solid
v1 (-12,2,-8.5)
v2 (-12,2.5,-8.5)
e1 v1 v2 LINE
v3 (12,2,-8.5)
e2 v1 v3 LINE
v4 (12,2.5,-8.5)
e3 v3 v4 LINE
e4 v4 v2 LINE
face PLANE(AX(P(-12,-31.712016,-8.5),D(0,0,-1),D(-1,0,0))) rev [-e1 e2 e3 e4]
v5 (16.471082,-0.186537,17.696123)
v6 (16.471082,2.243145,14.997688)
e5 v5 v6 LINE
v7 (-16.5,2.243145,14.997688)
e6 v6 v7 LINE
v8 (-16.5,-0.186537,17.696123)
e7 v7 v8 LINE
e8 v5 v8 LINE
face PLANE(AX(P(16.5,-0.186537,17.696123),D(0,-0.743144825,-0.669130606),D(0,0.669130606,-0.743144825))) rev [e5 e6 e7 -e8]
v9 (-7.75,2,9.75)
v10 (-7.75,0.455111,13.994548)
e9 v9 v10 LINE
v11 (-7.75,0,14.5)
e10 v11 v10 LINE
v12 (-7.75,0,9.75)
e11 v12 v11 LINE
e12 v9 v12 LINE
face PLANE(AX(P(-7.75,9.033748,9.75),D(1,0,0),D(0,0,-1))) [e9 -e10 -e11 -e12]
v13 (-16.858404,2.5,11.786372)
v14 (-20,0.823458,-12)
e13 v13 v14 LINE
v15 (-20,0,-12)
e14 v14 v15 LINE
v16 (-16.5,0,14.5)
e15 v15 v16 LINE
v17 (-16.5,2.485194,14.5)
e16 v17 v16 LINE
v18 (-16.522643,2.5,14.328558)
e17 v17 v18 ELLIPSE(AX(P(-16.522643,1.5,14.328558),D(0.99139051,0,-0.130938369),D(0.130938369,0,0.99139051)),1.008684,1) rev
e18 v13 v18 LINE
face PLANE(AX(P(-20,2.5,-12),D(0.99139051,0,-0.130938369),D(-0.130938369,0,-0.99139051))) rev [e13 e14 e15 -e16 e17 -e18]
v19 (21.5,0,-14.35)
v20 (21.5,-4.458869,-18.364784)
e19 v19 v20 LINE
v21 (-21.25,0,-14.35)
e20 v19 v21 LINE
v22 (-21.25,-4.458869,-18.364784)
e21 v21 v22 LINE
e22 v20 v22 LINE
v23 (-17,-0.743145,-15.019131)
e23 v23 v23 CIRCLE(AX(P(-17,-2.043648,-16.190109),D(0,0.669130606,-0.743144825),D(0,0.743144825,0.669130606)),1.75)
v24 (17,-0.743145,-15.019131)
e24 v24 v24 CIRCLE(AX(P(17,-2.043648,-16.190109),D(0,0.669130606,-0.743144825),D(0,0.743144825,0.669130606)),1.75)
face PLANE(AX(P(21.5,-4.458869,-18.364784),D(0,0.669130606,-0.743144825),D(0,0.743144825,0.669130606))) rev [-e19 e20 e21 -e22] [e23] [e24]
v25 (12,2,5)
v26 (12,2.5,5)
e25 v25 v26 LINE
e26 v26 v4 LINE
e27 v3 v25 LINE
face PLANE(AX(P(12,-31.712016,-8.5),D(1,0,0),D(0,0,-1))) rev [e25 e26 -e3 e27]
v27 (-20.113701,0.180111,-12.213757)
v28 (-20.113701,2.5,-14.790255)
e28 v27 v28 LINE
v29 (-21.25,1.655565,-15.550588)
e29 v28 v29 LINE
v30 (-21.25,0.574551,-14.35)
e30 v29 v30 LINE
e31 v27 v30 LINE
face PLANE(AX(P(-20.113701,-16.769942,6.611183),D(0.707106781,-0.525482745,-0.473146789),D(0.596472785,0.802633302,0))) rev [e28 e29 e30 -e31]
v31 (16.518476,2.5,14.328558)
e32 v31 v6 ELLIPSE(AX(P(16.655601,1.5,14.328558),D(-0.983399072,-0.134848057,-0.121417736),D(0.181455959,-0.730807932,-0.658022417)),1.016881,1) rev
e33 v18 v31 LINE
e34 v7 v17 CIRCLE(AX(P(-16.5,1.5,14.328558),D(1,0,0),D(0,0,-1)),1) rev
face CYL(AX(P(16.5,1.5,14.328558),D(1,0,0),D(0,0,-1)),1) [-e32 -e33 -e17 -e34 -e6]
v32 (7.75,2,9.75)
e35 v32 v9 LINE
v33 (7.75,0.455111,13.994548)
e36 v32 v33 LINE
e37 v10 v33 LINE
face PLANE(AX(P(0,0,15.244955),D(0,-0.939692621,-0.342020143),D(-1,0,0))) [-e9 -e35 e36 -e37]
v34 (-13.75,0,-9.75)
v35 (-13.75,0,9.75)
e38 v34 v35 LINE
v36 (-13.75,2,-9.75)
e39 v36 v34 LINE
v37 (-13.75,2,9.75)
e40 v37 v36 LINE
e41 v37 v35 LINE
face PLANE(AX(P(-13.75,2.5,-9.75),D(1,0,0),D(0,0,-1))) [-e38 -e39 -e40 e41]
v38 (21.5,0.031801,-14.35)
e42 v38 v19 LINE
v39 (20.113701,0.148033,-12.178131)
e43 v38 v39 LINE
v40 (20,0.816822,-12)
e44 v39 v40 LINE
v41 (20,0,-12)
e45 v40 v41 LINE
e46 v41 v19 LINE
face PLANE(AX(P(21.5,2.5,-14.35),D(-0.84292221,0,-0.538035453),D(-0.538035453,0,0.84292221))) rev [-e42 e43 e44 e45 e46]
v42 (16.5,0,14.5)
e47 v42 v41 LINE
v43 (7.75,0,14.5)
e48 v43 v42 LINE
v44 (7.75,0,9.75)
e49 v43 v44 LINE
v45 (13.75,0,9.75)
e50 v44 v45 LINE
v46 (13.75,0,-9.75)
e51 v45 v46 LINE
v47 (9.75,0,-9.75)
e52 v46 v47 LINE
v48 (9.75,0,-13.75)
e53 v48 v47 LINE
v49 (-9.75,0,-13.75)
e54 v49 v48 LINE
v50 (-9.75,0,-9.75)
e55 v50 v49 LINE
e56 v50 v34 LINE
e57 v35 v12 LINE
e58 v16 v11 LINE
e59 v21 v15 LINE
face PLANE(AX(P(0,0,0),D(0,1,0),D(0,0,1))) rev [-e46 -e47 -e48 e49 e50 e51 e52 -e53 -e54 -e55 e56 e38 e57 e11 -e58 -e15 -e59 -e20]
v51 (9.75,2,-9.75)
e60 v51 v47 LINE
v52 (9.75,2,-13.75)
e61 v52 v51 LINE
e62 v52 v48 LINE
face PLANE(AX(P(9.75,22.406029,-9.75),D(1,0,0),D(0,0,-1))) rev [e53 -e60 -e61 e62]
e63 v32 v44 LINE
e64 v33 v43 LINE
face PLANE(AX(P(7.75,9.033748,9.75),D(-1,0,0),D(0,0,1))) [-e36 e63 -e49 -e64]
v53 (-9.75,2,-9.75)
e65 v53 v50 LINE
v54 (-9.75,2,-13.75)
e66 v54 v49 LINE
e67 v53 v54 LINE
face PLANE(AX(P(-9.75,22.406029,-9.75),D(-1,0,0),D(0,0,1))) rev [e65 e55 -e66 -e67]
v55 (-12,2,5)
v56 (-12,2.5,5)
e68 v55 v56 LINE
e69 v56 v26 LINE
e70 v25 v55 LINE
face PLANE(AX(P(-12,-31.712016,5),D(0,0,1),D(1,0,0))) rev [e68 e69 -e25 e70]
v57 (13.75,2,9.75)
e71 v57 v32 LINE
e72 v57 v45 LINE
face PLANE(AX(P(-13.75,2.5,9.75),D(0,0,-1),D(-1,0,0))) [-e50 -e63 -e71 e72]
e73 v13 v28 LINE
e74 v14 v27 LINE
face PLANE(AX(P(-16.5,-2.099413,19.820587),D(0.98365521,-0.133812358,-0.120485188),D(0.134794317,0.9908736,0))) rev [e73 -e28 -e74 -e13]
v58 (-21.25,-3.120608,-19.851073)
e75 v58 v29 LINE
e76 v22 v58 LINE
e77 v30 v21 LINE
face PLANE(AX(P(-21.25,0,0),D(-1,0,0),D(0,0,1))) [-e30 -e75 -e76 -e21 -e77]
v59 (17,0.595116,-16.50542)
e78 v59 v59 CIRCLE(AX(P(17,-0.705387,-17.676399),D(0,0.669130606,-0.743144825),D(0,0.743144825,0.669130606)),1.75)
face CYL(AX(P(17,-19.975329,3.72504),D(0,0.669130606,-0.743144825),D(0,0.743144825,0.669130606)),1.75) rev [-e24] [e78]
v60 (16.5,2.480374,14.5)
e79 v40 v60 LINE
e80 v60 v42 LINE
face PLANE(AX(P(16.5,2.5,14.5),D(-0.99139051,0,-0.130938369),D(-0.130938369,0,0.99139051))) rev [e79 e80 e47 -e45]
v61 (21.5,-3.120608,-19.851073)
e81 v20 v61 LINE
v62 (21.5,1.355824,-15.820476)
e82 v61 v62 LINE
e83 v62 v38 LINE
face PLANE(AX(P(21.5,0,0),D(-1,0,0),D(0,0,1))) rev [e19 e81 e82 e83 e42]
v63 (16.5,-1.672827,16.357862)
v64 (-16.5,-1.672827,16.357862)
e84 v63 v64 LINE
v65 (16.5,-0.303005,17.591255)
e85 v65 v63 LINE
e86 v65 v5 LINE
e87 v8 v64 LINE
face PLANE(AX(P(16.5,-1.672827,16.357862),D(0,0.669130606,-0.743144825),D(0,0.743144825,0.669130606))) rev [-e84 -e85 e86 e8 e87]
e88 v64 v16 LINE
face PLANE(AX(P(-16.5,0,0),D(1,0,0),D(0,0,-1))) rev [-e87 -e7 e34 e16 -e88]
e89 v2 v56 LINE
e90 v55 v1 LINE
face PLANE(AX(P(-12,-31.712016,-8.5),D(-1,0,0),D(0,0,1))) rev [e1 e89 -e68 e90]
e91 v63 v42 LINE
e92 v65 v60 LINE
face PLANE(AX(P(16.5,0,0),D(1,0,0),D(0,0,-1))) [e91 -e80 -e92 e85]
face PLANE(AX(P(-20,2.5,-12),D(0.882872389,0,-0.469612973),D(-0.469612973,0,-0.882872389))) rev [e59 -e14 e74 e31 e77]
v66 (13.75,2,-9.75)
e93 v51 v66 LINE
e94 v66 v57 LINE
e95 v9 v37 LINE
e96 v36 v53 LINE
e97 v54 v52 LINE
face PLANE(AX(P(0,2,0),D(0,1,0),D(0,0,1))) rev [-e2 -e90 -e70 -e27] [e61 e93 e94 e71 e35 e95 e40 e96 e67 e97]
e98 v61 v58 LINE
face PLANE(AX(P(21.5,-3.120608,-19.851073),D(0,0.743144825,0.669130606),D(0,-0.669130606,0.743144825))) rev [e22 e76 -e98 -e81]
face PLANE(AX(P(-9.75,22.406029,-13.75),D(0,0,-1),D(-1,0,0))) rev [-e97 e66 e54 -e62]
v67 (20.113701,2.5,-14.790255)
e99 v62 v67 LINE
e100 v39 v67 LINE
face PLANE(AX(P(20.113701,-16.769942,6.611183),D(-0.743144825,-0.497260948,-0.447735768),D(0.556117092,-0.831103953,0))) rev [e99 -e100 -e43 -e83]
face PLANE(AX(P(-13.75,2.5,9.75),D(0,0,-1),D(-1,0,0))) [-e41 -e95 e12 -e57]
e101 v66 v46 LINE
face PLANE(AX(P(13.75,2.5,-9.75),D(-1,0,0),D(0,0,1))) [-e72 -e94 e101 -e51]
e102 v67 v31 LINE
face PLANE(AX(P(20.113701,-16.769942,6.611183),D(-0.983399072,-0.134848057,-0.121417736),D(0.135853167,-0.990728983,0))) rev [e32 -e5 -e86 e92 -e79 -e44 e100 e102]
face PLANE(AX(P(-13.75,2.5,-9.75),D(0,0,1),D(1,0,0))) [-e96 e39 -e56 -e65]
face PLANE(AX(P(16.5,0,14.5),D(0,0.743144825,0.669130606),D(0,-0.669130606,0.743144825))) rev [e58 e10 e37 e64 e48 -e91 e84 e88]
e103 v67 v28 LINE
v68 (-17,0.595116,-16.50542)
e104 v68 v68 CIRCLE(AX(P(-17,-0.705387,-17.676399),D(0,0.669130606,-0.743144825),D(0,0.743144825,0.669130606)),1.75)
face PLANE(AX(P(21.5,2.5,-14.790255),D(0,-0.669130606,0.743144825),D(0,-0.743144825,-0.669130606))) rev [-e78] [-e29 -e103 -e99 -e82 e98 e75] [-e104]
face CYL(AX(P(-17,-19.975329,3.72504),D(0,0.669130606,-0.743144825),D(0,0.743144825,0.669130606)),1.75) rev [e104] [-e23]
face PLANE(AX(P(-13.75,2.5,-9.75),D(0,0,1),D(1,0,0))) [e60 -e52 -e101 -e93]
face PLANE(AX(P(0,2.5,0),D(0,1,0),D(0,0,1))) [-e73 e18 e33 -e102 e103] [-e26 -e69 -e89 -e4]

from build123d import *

# Parameters (mm, degrees)
SKETCH1_W                = 27.5
SKETCH1_H                = 19.5
BOSS_EXTRUDE1_DEPTH      = 2.5
BOSS_EXTRUDE2_DEPTH      = 16.5
BOSS_EXTRUDE2_DEPTH_BACK = 16.5
BOSS_EXTRUDE3_DEPTH      = 21.5
BOSS_EXTRUDE3_DEPTH_BACK = 21.25
CUT_EXTRUDE1_DEPTH       = 37.936693725
SKETCH5_R                = 1.75
CUT_EXTRUDE2_DEPTH       = 37.936693725
CHAMFER1_SIZE            = 5.494954839
CHAMFER1_SIZE_2          = 2
BOSS_EXTRUDE4_REACH      = 31.601
SKETCH6_W                = 6
SKETCH6_H                = 4.75
SKETCH7_W                = 19.5
SKETCH7_H                = 4
CUT_EXTRUDE3_DEPTH       = 2
SKETCH8_W                = 27.5
SKETCH8_H                = 19.5
SKETCH8_W_2              = 24
SKETCH8_H_2              = 13.5
BOSS_EXTRUDE5_DEPTH      = 0.5
FILLET1_R                = 1


with BuildPart() as part:
    # Sketch1 → Boss-Extrude1 (new body)
    with BuildSketch(Plane(origin=(0, 0, 0), x_dir=(1, 0, 0), z_dir=(0, 1, 0))):
        Polygon((-16.5, -14.5), (16.5, -14.5), (20, 12), (21.5, 14.35), (-21.25, 14.35), (-20, 12), align=None)
        Rectangle(SKETCH1_W, SKETCH1_H, mode=Mode.SUBTRACT)
    extrude(amount=BOSS_EXTRUDE1_DEPTH)

    # Sketch2 → Boss-Extrude2 (add, two sides: drawn at the far end of the back side and taken through both)
    with BuildSketch(Plane(origin=(0, 0, 0), x_dir=(0, 0, -1), z_dir=(1, 0, 0)).offset(-BOSS_EXTRUDE2_DEPTH_BACK)):
        Polygon((-14.5, 0), (-16.357862064, -1.672826516), (-17.696123276, -0.186536865), (-14.712421813, 2.5), (-14.5, 2.5), align=None)
    extrude(amount=BOSS_EXTRUDE2_DEPTH + BOSS_EXTRUDE2_DEPTH_BACK)

    # Sketch3 → Boss-Extrude3 (add, two sides: drawn at the far end of the back side and taken through both)
    with BuildSketch(Plane(origin=(0, 0, 0), x_dir=(0, 0, -1), z_dir=(1, 0, 0)).offset(-BOSS_EXTRUDE3_DEPTH_BACK)):
        Polygon((14.35, 2.5), (14.790255348, 2.5), (19.851073289, -3.12060774), (18.364783638, -4.458868953), (14.35, 0), align=None)
    extrude(amount=BOSS_EXTRUDE3_DEPTH + BOSS_EXTRUDE3_DEPTH_BACK)

    # Sketch4 → Cut-Extrude1 (cut, through all)
    with BuildSketch(Plane(origin=(0, 8.473955812, -9.411281375), x_dir=(-1, 0, 0), z_dir=(0, 0.6691306063588619, -0.7431448254773909))):
        Polygon((-20.113700783, -8.038750466), (-16.458708787, 11.769448481), (-23.724996003, 11.769448481), (-23.724996003, -12.049500132), align=None)
        Polygon((20.113700783, -8.038750466), (24.708588094, -12.633637777), (20.852277712, 11.769448481), (16.5, 11.702393792), align=None)
    extrude(amount=-CUT_EXTRUDE1_DEPTH, mode=Mode.SUBTRACT)

    # Sketch5 → Cut-Extrude2 (cut, through all)
    with BuildSketch(Plane(origin=(0, 8.473955812, -9.411281375), x_dir=(-1, 0, 0), z_dir=(0, 0.6691306063588619, -0.7431448254773909))):
        with Locations(Location((-17, -12.352024201, 0), (0, 0, 90))):
            Circle(SKETCH5_R)
        with Locations(Location((17, -12.352024201, 0), (0, 0, 90))):
            Circle(SKETCH5_R)
    extrude(amount=-CUT_EXTRUDE2_DEPTH, mode=Mode.SUBTRACT)

    # Chamfer1
    # the kernel refuses this chamfer: 5.494954839, 2 mm, written as the material it takes off along each edge
    with BuildSketch(Plane(origin=(13.75, 0, 9.75), x_dir=(0, -0.013184058198645777, 0.9999130865277316), z_dir=(-1, 0, 0))) as chamfer1_piece_1_section:
        Polygon((CHAMFER1_SIZE * 0.999913086511, CHAMFER1_SIZE * 0.0131840581984), (-CHAMFER1_SIZE_2 * 0.0131840581986, CHAMFER1_SIZE_2 * 0.999913086528), (0, 0), align=None)
    chamfer1_piece_1 = extrude(amount=27.5, mode=Mode.PRIVATE)
    chamfer1_piece_1 = split(chamfer1_piece_1, bisect_by=Plane(origin=(0, 1.804468024, 12.49593523), z_dir=(0, -0.7431448254773978, -0.6691306063588544)), keep=Keep.TOP, mode=Mode.PRIVATE)
    add(chamfer1_piece_1, mode=Mode.SUBTRACT)

    # Boss-Extrude4: up to this plane
    boss_extrude4_end = Plane(origin=(0, 0, 15.244954839), z_dir=(0, -0.9396926207859098, -0.3420201433256651))
    # Sketch6 → Boss-Extrude4 (add, up to the surface)
    with BuildSketch(Plane.XZ, mode=Mode.PRIVATE) as boss_extrude4_sk1:
        with Locations((-10.75, 12.125)):
            Rectangle(SKETCH6_W, SKETCH6_H)
    boss_extrude4_tool1 = split(extrude(boss_extrude4_sk1.sketch, amount=-BOSS_EXTRUDE4_REACH, mode=Mode.PRIVATE), bisect_by=boss_extrude4_end, keep=Keep.BOTH, mode=Mode.PRIVATE)
    add(boss_extrude4_tool1.solids().sort_by_distance((-10.75, 0, 12.125))[0])
    # Sketch6 → Boss-Extrude4 (add, up to the surface)
    with BuildSketch(Plane.XZ, mode=Mode.PRIVATE) as boss_extrude4_sk2:
        with Locations((10.75, 12.125)):
            Rectangle(SKETCH6_W, SKETCH6_H)
    boss_extrude4_tool2 = split(extrude(boss_extrude4_sk2.sketch, amount=-BOSS_EXTRUDE4_REACH, mode=Mode.PRIVATE), bisect_by=boss_extrude4_end, keep=Keep.BOTH, mode=Mode.PRIVATE)
    add(boss_extrude4_tool2.solids().sort_by_distance((10.75, 0, 12.125))[0])

    # Sketch7 → Cut-Extrude3 (cut)
    with BuildSketch(Plane.XZ):
        with Locations((0, -11.75)):
            Rectangle(SKETCH7_W, SKETCH7_H)
    extrude(amount=-CUT_EXTRUDE3_DEPTH, mode=Mode.SUBTRACT)

    # Sketch8 → Boss-Extrude5 (add)
    with BuildSketch(Plane(origin=(0, 2.5, 0), x_dir=(1, 0, 0), z_dir=(0, 1, 0))):
        Rectangle(SKETCH8_W, SKETCH8_H)
        with Locations((0, 1.75)):
            Rectangle(SKETCH8_W_2, SKETCH8_H_2, mode=Mode.SUBTRACT)
    extrude(amount=-BOSS_EXTRUDE5_DEPTH)

    # Fillet1
    fillet1_edges = [part.edges().sort_by_distance(p)[0] for p in [
        (-0.01445917, 2.5, 14.712421813),
    ]]
    fillet(fillet1_edges, radius=FILLET1_R)


solid = part.part
